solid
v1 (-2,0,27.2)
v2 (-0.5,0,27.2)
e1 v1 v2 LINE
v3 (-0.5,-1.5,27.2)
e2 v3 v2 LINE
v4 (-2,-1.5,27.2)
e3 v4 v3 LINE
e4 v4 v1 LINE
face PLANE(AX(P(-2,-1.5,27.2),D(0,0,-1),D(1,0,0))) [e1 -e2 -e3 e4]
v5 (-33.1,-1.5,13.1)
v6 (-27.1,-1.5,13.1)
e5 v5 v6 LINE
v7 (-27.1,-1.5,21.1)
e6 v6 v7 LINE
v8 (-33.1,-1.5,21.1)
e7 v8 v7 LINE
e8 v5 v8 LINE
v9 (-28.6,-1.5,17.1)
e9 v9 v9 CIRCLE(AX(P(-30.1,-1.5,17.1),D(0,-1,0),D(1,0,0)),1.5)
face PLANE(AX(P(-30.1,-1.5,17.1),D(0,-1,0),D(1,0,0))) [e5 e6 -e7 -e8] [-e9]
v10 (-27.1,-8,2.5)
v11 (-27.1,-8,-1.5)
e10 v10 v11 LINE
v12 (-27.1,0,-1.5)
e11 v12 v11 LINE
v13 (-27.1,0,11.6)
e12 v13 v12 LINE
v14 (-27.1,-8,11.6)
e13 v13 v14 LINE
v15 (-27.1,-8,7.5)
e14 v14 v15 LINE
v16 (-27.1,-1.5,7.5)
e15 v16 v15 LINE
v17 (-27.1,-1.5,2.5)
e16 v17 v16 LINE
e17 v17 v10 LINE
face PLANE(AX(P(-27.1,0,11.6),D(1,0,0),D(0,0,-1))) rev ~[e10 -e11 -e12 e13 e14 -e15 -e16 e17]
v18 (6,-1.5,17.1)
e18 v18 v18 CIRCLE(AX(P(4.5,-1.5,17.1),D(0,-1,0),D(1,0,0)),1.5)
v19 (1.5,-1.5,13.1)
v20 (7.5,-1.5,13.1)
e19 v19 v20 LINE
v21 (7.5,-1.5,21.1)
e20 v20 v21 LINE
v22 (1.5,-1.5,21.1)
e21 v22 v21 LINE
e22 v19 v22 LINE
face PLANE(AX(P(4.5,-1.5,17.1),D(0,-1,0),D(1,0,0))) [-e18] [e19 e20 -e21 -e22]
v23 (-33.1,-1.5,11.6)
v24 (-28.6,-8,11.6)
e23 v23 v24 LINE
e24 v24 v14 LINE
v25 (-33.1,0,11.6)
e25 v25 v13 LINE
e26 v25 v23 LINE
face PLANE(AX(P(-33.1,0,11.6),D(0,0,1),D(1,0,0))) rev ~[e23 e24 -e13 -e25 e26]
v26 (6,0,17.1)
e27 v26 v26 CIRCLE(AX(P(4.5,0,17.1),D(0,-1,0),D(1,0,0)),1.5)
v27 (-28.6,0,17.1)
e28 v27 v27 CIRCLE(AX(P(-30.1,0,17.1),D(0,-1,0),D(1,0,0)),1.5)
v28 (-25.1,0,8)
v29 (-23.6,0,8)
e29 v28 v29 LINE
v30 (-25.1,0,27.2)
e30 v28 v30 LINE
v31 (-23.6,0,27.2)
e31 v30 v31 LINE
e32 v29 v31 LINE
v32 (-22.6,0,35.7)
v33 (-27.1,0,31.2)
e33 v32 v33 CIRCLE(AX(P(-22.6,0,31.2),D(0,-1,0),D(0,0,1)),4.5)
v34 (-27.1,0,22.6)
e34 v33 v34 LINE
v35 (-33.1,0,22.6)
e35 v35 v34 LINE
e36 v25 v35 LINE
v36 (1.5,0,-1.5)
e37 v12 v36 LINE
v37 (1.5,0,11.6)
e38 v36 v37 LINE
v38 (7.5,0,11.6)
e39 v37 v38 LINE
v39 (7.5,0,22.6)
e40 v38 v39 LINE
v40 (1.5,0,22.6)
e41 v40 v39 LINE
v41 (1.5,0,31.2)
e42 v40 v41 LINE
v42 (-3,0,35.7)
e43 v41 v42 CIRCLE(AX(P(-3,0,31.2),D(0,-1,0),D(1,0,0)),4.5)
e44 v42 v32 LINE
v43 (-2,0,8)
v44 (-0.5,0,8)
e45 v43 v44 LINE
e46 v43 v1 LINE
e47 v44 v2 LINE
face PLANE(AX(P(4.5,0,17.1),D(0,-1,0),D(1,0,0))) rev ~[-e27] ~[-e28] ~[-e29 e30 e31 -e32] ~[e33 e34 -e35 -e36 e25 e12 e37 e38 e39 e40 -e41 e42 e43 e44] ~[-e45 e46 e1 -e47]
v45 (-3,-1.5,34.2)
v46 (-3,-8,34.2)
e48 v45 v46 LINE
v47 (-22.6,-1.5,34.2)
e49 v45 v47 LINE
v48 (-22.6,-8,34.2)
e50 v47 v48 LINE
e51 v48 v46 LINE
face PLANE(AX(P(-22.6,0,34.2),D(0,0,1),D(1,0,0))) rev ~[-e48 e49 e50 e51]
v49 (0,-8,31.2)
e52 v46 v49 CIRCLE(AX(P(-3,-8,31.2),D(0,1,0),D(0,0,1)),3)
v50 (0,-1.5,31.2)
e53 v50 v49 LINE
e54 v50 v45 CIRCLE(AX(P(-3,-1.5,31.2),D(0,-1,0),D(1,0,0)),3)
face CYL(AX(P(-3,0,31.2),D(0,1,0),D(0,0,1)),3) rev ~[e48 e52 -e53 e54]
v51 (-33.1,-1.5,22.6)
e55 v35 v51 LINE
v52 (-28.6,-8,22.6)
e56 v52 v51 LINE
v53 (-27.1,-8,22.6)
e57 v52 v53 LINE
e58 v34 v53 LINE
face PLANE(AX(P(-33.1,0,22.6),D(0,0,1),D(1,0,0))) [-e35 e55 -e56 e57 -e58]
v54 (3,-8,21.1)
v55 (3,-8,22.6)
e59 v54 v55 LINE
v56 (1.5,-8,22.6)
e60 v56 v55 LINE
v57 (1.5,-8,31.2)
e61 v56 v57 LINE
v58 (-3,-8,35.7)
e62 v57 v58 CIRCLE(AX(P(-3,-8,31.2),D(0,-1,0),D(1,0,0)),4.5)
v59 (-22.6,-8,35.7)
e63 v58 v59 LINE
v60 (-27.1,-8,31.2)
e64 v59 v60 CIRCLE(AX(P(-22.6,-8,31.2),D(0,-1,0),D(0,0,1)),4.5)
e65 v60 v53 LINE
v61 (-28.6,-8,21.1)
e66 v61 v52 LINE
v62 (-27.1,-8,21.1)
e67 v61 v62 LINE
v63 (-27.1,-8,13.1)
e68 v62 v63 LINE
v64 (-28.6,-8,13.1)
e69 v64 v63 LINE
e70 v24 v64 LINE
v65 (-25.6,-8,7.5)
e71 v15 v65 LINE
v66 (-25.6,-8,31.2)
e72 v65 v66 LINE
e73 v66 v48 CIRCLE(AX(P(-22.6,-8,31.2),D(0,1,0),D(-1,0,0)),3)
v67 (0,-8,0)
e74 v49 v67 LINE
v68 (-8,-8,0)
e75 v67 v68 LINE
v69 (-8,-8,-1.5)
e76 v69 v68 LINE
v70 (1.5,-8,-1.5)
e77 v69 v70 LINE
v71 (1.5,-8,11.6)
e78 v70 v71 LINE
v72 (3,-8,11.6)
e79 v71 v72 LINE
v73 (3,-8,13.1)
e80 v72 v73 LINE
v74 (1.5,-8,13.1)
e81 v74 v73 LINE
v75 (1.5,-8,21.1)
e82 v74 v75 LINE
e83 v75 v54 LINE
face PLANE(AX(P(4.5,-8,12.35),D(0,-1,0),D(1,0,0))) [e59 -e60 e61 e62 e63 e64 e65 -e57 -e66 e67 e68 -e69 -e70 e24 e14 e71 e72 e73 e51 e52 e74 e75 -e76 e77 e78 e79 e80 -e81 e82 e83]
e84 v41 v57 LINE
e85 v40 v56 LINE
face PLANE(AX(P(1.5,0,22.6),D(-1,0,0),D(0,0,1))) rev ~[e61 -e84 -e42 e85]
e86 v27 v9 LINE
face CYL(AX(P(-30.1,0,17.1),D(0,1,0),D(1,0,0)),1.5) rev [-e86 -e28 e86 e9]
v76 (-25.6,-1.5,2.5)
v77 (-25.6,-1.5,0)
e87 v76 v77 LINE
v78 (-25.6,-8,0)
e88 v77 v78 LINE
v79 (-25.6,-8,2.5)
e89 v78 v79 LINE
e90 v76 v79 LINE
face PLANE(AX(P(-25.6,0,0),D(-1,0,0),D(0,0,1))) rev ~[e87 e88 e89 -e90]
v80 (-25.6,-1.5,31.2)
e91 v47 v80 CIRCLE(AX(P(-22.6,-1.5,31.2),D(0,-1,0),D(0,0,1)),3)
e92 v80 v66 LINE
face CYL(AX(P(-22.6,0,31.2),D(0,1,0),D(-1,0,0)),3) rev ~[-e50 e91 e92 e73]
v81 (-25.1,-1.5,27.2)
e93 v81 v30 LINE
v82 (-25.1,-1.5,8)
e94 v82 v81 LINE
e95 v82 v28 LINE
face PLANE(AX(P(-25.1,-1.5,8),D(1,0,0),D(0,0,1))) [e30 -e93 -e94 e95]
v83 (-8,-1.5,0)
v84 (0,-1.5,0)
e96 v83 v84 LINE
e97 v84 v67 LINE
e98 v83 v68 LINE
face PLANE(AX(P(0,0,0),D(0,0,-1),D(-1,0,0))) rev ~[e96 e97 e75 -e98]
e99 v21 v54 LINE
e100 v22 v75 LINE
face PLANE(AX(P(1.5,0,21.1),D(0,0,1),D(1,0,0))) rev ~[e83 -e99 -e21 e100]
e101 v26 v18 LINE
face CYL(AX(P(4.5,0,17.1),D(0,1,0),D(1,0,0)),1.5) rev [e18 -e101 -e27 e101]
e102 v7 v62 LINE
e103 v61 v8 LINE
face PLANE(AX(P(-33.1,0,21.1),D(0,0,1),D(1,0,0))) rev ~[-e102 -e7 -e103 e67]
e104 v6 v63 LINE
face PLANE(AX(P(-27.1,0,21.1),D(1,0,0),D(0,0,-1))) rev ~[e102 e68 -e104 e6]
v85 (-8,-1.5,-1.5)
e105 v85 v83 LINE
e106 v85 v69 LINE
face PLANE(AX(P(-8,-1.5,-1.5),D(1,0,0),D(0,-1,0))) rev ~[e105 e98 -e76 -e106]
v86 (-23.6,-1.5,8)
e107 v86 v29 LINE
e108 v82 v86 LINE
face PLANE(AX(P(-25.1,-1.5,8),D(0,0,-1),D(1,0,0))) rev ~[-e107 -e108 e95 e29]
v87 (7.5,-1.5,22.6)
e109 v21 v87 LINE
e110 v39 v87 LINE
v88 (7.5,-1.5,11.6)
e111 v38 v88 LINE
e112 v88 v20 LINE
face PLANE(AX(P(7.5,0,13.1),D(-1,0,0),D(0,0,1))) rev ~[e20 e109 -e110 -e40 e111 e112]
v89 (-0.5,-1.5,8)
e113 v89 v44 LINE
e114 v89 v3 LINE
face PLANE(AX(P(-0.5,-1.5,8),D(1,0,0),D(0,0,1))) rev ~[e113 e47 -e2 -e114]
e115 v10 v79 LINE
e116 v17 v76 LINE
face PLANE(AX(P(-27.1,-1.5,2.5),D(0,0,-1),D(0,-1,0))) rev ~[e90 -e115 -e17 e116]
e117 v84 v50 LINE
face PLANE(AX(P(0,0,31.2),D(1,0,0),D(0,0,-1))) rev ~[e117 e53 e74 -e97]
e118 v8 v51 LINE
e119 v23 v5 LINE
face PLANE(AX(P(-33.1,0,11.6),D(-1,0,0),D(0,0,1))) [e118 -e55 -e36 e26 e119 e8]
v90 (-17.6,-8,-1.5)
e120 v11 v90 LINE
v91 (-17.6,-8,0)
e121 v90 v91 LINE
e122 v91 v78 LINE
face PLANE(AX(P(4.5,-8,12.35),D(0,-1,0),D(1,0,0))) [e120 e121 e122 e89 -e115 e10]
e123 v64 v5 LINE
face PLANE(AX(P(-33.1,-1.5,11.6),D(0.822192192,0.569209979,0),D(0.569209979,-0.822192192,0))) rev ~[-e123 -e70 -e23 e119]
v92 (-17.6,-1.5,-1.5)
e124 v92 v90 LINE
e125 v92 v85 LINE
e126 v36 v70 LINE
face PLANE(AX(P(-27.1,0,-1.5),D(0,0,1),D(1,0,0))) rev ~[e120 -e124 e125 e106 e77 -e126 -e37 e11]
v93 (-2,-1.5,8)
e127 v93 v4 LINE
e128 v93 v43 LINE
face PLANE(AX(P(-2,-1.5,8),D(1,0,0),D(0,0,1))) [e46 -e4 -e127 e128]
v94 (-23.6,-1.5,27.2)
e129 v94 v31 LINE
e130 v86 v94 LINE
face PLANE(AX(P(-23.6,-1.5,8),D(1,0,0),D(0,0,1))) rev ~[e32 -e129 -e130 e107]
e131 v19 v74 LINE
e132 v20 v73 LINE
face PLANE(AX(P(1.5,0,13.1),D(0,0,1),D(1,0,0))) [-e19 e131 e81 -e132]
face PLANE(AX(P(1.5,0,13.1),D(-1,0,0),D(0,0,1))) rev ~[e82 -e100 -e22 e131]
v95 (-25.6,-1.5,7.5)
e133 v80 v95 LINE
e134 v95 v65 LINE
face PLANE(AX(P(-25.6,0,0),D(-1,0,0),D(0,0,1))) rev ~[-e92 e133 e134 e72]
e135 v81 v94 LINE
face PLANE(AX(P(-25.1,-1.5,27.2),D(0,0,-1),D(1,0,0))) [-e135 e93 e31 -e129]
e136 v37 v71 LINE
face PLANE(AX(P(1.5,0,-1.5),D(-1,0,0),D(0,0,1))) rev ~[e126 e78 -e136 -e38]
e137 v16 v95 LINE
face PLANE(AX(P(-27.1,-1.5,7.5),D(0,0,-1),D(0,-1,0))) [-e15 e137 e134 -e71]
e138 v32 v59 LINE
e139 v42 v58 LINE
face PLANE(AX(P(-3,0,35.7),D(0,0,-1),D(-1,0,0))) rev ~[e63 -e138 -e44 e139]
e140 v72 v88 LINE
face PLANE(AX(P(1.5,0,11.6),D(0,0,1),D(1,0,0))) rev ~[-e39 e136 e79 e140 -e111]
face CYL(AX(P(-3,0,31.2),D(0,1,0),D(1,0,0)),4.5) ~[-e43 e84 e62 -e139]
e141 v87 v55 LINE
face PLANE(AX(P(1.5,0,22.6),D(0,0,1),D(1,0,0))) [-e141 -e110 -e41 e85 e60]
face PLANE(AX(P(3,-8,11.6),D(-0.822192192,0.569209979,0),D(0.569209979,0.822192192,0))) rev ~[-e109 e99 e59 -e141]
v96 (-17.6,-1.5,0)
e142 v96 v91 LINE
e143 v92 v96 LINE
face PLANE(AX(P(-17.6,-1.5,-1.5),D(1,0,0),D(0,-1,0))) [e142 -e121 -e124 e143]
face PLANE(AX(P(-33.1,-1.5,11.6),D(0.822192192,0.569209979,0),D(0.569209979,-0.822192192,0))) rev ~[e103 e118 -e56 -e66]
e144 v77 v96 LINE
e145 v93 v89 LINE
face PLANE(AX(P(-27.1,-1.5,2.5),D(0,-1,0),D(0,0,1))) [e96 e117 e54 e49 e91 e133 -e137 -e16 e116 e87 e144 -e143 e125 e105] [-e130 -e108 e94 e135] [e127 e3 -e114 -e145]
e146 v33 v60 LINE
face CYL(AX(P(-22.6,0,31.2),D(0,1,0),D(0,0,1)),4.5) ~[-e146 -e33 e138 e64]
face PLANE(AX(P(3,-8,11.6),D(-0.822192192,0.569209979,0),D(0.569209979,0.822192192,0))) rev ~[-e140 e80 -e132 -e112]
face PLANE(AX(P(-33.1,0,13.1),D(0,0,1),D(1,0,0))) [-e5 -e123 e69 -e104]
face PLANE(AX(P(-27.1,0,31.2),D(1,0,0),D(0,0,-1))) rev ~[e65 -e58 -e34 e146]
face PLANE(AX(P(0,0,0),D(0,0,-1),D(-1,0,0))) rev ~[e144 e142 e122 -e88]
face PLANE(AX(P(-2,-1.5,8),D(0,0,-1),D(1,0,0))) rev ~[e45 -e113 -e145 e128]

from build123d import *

# Parameters (mm, degrees)
F0_W      = 6
F0_H      = 1.5
F1_DEPTH  = 8
F0_H_2    = 8
F0_R      = 1.5
F2_DEPTH  = 1.5
F4_DEPTH  = 25
F6_DEPTH  = 25
F7_W      = 9.6
F7_H      = 6.5
F8_DEPTH  = 1.5
F9_W      = 6.5
F9_H      = 5
F10_DEPTH = 1.5
F11_W     = 1.5
F11_H     = 19.2
F12_DEPTH = 1.5


# Not quite as in the source:
# - a feature names something its author has since deleted; it is built from what else it names


with BuildPart() as f1:
    # F0 (on Front) → F1 (new body)
    with BuildSketch(Plane.XZ):
        with Locations((4.5, 12.35)):
            Rectangle(F0_W, F0_H)
        with Locations((4.5, 21.85)):
            Rectangle(F0_W, F0_H)
        with Locations((-30.1, 12.35)):
            Rectangle(F0_W, F0_H)
        with Locations((-30.1, 21.85)):
            Rectangle(F0_W, F0_H)
        with BuildLine():
            Line((-27.1, 11.6), (-27.1, -1.5))
            Line((-27.1, -1.5), (1.5, -1.5))
            Line((1.5, -1.5), (1.5, 11.6))
            Line((1.5, 11.6), (1.5, 13.1))
            Line((1.5, 13.1), (1.5, 21.1))
            Line((1.5, 21.1), (1.5, 22.6))
            Line((1.5, 22.6), (1.5, 31.2))
            ThreePointArc((1.5, 31.2), (0.1819805153, 34.3819805153), (-3, 35.7))
            Line((-3, 35.7), (-22.6, 35.7))
            ThreePointArc((-22.6, 35.7), (-25.7819805153, 34.3819805153), (-27.1, 31.2))
            Line((-27.1, 31.2), (-27.1, 22.6))
            Line((-27.1, 22.6), (-27.1, 21.1))
            Line((-27.1, 21.1), (-27.1, 13.1))
            Line((-27.1, 13.1), (-27.1, 11.6))
        make_face()
        with BuildLine():
            ThreePointArc((-25.6, 31.2), (-24.7213203436, 33.3213203436), (-22.6, 34.2))
            Line((-22.6, 34.2), (-3, 34.2))
            ThreePointArc((-3, 34.2), (-0.8786796564, 33.3213203436), (0, 31.2))
            Line((0, 31.2), (0, 0))
            Line((0, 0), (-25.6, 0))
            Line((-25.6, 0), (-25.6, 31.2))
        make_face(mode=Mode.SUBTRACT)
    extrude(amount=F1_DEPTH)

    # F0 (on Front) → F2 (join)
    with BuildSketch(Plane.XZ):
        with Locations((4.5, 17.1)):
            Rectangle(F0_W, F0_H_2)
        with Locations((4.5, 17.1)):
            Circle(F0_R, mode=Mode.SUBTRACT)
        with Locations((-30.1, 17.1)):
            Rectangle(F0_W, F0_H_2)
        with Locations((-30.1, 17.1)):
            Circle(F0_R, mode=Mode.SUBTRACT)
        with BuildLine():
            Line((-3, 34.2), (-22.6, 34.2))
            ThreePointArc((-22.6, 34.2), (-24.7213203436, 33.3213203436), (-25.6, 31.2))
            Line((-25.6, 31.2), (-25.6, 0))
            Line((-25.6, 0), (0, 0))
            Line((0, 0), (0, 31.2))
            ThreePointArc((0, 31.2), (-0.8786796564, 33.3213203436), (-3, 34.2))
        make_face()
    extrude(amount=F2_DEPTH)

    # F3 (on face) → F4 (cut)
    with BuildSketch(Plane(origin=(0, 0, 11.6), x_dir=(1, 0, 0), z_dir=(0, 0, -1))):
        Polygon((7.5, 8), (3, 8), (7.5, 1.5), align=None)
    extrude(amount=-F4_DEPTH, mode=Mode.SUBTRACT)

    # F5 (on face) → F6 (cut)
    with BuildSketch(Plane(origin=(0, 0, 11.6), x_dir=(1, 0, 0), z_dir=(0, 0, -1))):
        Polygon((-33.1, 1.5), (-28.6, 8), (-33.1, 8), align=None)
    extrude(amount=-F6_DEPTH, mode=Mode.SUBTRACT)

    # F7 (on face) → F8 (cut, through all)
    with BuildSketch(Plane(origin=(0, 0, -1.5), x_dir=(1, 0, 0), z_dir=(0, 0, -1))):
        with Locations((-12.8, 4.75)):
            Rectangle(F7_W, F7_H)
    extrude(amount=-F8_DEPTH, mode=Mode.SUBTRACT)

    # F9 (on face) → F10 (cut, through all)
    with BuildSketch(Plane(origin=(-27.1, 0, 0), x_dir=(0, -1, 0), z_dir=(-1, 0, 0))):
        with Locations((4.75, 5)):
            Rectangle(F9_W, F9_H)
    extrude(amount=-F10_DEPTH, mode=Mode.SUBTRACT)

    # F11 (on face) → F12 (cut, through all)
    with BuildSketch(Plane.XZ.offset(1.5)):
        with Locations((-24.35, 17.6)):
            Rectangle(F11_W, F11_H)
        with Locations((-1.25, 17.6)):
            Rectangle(F11_W, F11_H)
    extrude(amount=-F12_DEPTH, mode=Mode.SUBTRACT)


solid = f1.part
